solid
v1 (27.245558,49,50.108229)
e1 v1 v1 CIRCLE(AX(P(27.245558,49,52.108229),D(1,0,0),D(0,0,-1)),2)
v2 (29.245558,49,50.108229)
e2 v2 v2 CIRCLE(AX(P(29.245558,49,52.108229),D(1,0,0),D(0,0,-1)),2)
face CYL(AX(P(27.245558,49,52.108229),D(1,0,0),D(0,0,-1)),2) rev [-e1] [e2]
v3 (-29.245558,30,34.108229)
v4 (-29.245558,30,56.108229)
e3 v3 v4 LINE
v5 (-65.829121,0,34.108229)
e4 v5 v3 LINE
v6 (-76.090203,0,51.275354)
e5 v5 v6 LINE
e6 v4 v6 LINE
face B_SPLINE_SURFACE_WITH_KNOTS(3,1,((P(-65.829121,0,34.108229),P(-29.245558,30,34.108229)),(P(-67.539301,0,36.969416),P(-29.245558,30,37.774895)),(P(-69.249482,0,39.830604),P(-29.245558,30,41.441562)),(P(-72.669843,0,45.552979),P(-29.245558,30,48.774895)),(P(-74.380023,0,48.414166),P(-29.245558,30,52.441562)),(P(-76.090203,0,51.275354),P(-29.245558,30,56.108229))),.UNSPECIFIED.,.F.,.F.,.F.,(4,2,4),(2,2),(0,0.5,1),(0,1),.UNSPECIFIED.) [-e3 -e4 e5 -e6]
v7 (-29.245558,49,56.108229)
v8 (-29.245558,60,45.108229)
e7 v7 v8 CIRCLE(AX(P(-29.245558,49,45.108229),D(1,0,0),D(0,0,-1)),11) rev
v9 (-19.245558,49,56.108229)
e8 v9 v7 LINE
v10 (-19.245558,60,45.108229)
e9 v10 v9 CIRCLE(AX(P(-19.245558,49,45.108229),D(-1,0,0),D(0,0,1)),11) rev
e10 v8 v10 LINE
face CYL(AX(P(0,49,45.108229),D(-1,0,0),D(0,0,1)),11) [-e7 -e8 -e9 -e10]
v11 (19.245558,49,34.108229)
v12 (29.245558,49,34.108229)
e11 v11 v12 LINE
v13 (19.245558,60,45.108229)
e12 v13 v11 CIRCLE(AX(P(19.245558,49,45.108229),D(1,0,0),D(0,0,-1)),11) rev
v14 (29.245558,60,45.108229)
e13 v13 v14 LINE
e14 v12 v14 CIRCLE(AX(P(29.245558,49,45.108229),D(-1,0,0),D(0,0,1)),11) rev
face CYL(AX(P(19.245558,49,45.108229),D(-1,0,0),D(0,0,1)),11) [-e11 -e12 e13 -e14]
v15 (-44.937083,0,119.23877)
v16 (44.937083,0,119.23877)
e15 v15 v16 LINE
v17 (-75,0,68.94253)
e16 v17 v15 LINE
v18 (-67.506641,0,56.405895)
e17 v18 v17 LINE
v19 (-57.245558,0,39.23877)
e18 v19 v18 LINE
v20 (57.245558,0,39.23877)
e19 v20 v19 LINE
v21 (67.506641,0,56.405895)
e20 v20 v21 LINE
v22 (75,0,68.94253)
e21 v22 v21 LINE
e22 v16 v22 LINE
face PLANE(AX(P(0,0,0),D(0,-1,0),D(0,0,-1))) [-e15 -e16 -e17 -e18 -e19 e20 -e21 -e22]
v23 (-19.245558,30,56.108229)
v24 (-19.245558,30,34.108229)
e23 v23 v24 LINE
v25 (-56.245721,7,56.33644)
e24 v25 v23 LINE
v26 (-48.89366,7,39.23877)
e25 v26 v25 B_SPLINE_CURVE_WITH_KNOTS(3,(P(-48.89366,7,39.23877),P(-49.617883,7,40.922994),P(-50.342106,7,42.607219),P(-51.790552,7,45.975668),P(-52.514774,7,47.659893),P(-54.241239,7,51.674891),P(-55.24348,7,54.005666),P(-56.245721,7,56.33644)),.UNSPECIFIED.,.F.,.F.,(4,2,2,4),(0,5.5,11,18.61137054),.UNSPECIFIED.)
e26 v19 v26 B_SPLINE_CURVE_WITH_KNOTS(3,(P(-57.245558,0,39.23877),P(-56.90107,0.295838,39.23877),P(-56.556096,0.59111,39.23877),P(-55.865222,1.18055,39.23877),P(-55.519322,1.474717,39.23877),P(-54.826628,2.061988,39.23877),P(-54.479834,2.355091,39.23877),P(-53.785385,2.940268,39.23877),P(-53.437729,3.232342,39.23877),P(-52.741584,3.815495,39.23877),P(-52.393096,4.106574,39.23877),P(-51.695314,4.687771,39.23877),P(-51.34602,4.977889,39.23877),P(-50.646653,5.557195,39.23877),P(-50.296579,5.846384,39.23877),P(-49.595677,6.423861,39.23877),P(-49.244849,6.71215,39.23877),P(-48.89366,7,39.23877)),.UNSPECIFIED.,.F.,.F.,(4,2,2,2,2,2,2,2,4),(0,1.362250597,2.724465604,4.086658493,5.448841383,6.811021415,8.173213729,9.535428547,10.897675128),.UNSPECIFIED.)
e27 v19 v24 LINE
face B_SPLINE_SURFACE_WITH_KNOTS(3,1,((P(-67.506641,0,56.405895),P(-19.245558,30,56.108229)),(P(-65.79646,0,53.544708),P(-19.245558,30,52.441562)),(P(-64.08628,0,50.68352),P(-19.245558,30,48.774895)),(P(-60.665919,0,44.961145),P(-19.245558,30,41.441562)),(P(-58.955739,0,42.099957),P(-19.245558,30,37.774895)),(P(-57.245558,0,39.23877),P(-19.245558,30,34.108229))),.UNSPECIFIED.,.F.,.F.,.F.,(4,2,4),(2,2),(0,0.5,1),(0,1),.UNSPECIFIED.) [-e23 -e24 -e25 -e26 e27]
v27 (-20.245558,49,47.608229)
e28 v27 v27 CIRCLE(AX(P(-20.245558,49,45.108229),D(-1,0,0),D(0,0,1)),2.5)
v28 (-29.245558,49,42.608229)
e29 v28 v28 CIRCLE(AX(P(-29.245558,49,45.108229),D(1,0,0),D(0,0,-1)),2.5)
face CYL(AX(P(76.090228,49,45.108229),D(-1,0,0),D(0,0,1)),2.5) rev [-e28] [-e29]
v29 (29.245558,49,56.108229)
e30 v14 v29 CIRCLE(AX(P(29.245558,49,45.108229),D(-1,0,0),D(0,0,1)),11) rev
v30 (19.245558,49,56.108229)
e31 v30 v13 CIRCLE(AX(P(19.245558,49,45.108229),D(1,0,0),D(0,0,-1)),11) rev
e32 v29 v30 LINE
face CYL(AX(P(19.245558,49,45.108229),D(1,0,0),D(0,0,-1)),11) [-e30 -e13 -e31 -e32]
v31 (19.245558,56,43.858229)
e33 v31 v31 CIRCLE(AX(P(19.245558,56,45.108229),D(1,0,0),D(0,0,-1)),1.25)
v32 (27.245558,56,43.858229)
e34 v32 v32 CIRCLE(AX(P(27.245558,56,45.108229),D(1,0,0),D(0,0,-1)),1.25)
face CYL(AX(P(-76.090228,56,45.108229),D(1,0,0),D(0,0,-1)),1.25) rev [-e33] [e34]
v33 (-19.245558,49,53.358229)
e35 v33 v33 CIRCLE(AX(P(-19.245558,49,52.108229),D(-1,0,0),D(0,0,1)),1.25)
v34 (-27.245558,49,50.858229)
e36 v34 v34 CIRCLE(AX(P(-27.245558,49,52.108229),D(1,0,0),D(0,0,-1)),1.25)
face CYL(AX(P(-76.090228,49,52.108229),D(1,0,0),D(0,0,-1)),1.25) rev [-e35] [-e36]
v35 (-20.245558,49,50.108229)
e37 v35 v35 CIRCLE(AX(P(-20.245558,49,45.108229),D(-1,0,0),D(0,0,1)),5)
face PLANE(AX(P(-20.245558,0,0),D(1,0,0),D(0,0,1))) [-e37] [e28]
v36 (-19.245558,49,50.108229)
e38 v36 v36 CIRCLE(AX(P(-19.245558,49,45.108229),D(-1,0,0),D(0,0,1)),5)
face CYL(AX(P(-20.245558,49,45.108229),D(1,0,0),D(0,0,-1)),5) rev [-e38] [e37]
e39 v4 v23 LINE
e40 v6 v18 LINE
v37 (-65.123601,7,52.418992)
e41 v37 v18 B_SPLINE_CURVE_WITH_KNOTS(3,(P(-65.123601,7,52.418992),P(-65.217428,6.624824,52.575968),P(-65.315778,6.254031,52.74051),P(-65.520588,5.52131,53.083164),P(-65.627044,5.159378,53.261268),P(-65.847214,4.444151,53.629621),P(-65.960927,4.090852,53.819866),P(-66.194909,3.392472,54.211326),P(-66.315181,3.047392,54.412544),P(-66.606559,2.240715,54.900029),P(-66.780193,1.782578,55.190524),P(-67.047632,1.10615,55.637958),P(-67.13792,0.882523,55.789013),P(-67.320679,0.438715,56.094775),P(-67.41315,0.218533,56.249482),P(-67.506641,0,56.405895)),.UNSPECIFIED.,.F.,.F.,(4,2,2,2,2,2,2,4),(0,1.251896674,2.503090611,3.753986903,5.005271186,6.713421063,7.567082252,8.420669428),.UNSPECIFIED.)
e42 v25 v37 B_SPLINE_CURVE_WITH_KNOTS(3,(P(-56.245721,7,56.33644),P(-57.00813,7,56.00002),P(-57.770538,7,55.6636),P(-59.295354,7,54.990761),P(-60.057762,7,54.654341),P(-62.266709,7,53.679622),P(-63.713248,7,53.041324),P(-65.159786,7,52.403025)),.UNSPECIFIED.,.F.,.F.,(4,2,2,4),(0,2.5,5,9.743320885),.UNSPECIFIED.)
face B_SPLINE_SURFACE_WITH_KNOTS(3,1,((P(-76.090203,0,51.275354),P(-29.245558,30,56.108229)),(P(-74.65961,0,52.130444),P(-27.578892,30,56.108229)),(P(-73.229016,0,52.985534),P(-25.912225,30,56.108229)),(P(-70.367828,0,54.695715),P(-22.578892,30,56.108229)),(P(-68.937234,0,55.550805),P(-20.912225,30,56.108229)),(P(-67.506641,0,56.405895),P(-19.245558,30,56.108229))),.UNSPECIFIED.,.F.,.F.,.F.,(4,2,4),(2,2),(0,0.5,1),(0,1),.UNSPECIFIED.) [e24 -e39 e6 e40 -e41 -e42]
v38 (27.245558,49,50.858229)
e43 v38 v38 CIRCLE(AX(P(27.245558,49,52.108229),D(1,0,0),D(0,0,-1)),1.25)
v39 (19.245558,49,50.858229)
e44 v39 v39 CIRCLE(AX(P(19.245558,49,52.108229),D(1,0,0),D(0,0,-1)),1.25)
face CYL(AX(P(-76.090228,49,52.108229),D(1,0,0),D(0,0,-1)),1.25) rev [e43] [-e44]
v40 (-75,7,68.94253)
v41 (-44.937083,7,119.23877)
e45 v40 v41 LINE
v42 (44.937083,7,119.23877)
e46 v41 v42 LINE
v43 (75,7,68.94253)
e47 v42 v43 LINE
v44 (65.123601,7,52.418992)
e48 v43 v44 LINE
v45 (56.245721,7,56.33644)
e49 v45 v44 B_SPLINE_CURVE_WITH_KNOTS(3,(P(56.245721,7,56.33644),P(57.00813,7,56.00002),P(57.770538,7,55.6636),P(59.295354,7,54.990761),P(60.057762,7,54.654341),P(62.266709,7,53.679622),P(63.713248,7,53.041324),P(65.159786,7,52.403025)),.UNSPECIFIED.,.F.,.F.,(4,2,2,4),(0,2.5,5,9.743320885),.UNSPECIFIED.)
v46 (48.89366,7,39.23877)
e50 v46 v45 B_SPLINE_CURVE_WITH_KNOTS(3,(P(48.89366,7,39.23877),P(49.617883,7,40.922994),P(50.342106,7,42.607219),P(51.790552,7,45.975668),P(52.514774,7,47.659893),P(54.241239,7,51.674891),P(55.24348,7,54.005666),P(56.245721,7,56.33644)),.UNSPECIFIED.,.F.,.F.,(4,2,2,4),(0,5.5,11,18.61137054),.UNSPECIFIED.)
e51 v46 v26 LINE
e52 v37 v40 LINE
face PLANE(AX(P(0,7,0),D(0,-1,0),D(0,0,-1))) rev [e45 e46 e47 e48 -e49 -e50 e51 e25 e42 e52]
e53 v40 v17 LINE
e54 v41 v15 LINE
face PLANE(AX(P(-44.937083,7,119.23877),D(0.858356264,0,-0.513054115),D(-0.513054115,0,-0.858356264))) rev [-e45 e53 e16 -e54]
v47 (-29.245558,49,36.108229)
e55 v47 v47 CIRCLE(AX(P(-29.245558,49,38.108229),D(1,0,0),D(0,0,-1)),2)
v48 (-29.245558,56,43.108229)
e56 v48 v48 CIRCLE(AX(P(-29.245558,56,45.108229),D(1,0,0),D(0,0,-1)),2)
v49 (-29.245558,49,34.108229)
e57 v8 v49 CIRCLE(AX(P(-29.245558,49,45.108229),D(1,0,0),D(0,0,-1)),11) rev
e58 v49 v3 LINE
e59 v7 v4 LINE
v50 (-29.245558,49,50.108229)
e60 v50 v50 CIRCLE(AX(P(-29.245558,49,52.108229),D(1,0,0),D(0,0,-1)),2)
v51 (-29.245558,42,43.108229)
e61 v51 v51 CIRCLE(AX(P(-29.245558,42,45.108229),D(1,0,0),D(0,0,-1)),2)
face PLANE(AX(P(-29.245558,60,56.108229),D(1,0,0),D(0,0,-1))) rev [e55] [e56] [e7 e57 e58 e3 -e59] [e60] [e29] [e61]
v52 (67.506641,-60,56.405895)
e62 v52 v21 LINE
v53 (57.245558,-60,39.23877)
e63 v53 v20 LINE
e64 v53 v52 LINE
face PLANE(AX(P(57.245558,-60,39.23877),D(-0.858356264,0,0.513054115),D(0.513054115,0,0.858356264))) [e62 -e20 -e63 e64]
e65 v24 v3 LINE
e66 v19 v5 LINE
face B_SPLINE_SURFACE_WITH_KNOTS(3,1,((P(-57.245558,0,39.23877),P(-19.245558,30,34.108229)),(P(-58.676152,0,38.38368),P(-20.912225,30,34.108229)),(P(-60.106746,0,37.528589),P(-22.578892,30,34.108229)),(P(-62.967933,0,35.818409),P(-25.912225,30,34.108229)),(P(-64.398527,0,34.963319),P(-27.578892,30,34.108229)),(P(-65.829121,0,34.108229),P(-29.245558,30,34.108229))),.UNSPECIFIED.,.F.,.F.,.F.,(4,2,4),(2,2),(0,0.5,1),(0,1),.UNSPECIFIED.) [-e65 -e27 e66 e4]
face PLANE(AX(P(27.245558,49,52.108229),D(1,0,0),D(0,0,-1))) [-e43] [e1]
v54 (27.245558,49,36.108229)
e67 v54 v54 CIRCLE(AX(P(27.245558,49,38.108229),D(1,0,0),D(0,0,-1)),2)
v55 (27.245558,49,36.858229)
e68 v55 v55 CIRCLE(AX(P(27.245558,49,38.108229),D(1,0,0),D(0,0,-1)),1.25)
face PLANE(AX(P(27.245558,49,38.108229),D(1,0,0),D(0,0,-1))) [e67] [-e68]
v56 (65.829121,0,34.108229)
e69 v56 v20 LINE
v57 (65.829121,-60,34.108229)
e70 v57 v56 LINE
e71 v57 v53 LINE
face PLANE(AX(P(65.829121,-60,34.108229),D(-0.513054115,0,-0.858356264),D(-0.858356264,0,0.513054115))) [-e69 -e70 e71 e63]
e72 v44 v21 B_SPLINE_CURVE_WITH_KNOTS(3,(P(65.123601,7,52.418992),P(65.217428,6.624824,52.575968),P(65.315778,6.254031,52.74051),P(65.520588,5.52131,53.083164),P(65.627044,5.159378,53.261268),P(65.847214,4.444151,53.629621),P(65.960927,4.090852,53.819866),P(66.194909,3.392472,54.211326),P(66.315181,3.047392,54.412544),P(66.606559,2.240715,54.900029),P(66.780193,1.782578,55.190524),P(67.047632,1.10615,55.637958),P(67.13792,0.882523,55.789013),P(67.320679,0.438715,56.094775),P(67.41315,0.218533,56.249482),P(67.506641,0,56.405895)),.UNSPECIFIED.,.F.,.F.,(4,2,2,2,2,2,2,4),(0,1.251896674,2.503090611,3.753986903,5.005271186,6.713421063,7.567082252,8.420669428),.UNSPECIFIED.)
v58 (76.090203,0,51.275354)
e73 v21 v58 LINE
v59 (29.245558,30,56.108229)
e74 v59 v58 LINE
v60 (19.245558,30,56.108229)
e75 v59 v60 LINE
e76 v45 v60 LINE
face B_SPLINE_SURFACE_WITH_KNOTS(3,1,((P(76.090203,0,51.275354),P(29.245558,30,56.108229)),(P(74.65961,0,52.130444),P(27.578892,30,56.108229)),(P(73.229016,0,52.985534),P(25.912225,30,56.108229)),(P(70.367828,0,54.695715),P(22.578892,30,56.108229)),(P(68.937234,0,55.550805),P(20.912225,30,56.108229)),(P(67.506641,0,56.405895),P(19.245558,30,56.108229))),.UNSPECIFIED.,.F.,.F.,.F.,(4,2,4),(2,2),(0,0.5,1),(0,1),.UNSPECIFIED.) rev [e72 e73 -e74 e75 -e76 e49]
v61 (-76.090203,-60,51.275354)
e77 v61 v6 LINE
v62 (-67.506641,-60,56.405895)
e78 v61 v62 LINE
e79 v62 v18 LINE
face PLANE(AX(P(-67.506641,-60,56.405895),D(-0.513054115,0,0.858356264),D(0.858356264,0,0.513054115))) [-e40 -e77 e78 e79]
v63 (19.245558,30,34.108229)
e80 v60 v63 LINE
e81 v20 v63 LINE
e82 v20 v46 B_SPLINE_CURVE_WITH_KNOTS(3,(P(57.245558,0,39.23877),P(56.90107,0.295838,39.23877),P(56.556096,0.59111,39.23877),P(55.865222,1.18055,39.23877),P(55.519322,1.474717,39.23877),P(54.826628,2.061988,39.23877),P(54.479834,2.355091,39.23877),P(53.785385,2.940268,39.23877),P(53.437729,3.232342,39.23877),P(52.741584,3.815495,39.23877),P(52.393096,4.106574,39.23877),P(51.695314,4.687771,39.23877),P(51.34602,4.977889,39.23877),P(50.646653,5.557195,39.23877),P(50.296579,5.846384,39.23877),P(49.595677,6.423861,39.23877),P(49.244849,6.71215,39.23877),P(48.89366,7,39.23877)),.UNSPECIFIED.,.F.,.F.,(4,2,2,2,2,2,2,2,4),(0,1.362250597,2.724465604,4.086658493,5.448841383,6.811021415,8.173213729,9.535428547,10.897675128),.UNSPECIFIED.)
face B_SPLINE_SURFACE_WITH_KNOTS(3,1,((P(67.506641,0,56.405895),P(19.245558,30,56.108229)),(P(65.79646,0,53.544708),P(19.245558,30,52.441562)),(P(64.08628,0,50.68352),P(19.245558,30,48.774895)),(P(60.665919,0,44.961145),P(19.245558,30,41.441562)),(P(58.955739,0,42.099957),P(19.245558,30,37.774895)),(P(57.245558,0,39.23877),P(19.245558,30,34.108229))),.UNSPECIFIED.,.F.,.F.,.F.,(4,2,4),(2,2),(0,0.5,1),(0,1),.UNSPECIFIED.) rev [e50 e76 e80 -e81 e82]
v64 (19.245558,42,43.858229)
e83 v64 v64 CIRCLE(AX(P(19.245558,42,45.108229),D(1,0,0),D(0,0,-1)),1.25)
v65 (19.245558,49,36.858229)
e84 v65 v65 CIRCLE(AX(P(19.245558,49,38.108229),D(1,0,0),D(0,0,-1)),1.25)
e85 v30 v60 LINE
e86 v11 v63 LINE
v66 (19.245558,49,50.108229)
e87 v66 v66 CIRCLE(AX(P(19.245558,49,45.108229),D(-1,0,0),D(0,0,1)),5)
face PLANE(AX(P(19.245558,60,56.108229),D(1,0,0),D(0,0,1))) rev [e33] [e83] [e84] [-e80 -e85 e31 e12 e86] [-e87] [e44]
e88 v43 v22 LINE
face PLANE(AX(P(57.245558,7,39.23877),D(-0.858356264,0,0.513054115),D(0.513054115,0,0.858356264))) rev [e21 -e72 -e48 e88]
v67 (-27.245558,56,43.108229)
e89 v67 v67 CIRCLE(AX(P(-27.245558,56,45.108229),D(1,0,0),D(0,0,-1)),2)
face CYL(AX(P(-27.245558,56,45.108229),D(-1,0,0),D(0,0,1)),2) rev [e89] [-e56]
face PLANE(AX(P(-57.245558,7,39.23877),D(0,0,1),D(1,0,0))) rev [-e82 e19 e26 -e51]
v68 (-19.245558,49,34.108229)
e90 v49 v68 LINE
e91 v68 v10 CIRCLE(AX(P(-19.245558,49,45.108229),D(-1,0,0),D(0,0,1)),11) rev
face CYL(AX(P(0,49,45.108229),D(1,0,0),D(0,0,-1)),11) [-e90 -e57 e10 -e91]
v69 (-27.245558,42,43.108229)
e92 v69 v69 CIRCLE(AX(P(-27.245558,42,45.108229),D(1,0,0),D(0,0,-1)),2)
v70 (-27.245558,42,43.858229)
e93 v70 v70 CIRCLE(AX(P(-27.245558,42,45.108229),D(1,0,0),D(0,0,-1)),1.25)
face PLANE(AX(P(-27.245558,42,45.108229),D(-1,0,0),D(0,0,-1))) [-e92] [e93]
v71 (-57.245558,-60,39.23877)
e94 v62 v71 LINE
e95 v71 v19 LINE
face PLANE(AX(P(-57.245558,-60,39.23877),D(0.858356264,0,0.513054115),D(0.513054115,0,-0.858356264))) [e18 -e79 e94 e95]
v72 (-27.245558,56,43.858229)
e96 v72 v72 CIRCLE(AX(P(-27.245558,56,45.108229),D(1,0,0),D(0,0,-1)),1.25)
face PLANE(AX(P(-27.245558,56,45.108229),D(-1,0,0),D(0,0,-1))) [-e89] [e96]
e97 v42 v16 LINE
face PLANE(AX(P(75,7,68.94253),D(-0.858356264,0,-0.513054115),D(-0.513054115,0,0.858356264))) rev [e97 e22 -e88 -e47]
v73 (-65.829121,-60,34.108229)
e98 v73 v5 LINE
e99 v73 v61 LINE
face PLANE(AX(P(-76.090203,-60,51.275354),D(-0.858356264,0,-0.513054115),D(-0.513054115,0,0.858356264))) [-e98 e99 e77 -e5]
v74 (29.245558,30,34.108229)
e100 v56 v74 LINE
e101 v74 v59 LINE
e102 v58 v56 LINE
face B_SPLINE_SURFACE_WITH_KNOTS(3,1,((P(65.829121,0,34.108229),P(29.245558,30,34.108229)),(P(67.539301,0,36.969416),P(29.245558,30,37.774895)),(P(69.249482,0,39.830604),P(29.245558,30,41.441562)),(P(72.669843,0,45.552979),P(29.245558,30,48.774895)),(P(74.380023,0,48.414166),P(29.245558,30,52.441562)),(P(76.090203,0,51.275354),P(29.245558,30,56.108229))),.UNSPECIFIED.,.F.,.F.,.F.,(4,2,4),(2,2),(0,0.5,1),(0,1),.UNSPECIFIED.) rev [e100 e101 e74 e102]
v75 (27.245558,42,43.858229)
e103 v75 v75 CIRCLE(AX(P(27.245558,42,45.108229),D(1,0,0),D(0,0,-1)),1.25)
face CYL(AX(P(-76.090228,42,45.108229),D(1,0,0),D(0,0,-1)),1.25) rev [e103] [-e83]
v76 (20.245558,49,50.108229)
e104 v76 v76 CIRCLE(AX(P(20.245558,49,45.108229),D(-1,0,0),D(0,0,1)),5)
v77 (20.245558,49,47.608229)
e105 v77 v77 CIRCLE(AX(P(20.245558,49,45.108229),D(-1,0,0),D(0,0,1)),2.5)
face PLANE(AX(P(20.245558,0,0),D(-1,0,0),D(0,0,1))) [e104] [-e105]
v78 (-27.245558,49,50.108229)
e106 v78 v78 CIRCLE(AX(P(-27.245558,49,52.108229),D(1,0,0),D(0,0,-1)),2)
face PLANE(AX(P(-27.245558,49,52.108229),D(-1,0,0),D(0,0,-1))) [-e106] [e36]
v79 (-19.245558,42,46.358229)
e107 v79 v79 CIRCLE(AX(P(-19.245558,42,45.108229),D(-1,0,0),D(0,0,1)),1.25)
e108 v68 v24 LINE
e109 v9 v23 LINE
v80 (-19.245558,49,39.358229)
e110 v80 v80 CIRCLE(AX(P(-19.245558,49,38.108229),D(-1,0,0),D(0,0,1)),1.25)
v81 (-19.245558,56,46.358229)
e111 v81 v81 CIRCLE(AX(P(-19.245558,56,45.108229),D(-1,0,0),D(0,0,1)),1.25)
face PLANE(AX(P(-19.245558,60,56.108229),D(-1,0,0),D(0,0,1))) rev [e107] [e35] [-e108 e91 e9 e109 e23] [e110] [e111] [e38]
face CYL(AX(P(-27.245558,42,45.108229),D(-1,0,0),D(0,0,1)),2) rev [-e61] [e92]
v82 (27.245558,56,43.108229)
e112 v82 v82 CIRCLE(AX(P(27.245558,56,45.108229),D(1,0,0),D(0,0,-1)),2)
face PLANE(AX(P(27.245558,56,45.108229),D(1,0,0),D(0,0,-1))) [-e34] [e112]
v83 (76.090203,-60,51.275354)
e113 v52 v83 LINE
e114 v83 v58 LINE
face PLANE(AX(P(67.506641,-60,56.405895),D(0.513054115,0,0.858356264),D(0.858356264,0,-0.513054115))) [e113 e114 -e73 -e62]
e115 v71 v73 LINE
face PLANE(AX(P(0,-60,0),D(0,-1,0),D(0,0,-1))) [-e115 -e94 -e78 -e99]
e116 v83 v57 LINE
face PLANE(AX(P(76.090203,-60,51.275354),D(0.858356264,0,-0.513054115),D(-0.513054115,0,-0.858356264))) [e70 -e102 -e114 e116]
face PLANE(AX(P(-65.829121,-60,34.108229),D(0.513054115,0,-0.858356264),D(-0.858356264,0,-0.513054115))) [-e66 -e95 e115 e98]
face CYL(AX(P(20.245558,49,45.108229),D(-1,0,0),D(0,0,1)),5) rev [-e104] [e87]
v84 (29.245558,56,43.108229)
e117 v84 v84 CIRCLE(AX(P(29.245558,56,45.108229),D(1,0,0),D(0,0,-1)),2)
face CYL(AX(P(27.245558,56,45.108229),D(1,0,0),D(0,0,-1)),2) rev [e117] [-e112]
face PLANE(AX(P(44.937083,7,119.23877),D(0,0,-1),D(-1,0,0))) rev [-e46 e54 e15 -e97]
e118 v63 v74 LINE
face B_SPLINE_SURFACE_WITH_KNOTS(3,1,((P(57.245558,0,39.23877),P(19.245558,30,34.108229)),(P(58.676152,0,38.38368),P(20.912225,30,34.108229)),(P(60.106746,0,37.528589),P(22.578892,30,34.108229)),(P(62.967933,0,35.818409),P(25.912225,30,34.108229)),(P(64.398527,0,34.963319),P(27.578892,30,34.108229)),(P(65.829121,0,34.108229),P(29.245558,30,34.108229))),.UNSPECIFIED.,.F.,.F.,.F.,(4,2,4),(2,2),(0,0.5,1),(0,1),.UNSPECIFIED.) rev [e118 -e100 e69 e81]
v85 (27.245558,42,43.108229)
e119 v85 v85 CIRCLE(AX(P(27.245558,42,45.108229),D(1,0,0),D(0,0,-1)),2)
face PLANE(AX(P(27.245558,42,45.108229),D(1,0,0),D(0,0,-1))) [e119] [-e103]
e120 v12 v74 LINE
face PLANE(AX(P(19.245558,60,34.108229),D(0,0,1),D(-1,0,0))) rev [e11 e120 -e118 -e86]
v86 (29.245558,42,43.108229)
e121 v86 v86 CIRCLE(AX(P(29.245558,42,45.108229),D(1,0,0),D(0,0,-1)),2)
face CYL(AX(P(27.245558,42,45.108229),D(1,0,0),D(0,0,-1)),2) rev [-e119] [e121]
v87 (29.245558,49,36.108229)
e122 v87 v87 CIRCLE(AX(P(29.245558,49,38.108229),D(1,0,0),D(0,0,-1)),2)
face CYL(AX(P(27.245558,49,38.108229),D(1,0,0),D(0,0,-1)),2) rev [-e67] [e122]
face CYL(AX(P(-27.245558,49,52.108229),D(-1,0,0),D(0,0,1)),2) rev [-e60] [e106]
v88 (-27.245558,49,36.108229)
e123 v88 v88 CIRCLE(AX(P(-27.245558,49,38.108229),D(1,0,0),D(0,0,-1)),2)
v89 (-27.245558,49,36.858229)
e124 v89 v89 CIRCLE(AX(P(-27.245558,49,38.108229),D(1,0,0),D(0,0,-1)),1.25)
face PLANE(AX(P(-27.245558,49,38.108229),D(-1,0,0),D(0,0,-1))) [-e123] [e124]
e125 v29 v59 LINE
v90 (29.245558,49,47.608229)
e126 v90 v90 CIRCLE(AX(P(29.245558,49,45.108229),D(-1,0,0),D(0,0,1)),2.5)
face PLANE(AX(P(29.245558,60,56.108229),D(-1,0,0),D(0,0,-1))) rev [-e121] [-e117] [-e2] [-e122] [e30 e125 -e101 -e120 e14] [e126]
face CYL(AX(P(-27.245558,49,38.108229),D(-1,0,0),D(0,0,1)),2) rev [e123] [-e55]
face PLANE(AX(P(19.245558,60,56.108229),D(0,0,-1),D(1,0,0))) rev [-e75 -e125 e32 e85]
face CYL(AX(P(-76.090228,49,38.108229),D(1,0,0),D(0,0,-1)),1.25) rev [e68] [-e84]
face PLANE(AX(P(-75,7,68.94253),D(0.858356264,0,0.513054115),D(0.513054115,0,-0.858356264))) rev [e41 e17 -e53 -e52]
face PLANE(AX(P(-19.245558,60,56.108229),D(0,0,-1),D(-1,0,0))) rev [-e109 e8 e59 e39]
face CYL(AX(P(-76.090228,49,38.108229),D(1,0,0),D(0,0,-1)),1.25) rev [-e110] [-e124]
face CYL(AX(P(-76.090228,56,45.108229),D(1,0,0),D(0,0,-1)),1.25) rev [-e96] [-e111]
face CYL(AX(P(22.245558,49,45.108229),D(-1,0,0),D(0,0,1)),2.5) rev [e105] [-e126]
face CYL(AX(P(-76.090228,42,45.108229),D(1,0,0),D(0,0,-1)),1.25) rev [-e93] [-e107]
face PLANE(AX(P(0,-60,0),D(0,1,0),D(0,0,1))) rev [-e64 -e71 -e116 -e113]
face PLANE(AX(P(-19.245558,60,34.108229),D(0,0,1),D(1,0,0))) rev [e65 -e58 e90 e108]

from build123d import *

# Parameters (mm, degrees)
BOSS_EXTRUDE1_DEPTH     = 60
BOSS_EXTRUDE1_2_DEPTH   = 60
BOSS_EXTRUDE2_START     = 30
SKETCH5_W               = 10
SKETCH5_H               = 22
BOSS_EXTRUDE2_DEPTH     = 30
FILLET1_R               = 11
FILLET2_R               = 11
BOSS_EXTRUDE5_DEPTH     = 7
SKETCH12_R              = 5
SKETCH12_R_2            = 2.5
CUT_EXTRUDE1_DEPTH      = 1
SKETCH12_3_R            = 2.5
CUT_EXTRUDE2_DEPTH      = 3
CUT_EXTRUDE8_DEPTH      = 165.032898367
CUT_EXTRUDE8_DEPTH_BACK = 165.032898367
SKETCH16_R              = 2.5
SKETCH17_R              = 1.25
CUT_EXTRUDE9_DEPTH      = 171.03972178
SKETCH17_3_R            = 2
SKETCH17_3_R_2          = 1.25
CUT_EXTRUDE10_DEPTH     = 2


with BuildPart() as part:
    # Sketch4 → Boss-Extrude1 (new body)
    with BuildSketch(Plane(origin=(0, 0, 0), x_dir=(1, 0, 0), z_dir=(0, 1, 0))):
        Polygon((67.506640691, -56.405895144), (76.090203327, -51.275353996), (65.82912103, -34.108228724), (57.245558394, -39.238769873), align=None)
    extrude(amount=-BOSS_EXTRUDE1_DEPTH)



with BuildPart() as body_2:
    # Sketch4 → Boss-Extrude1 2 (new body)
    with BuildSketch(Plane(origin=(0, 0, 0), x_dir=(1, 0, 0), z_dir=(0, 1, 0))):
        Polygon((-57.245558394, -39.238769873), (-67.506640691, -56.405895144), (-76.090203327, -51.275353996), (-65.82912103, -34.108228724), align=None)
    extrude(amount=-BOSS_EXTRUDE1_2_DEPTH)



with BuildPart() as body_3:
    # Sketch5 → Boss-Extrude2 (new body)
    with BuildSketch(Plane(origin=(0, 0, 0), x_dir=(1, 0, 0), z_dir=(0, 1, 0)).offset(BOSS_EXTRUDE2_START)):
        with Locations((-24.245558394, -45.108228724)):
            Rectangle(SKETCH5_W, SKETCH5_H)
    extrude(amount=BOSS_EXTRUDE2_DEPTH)


with BuildPart() as body_2_1:
    add(body_2.part)

    add(body_3.part)  # loft1 joins it to this body
    # loft from a face of the part (loft1)
    loft([body_2_1.faces().sort_by_distance((-66.667880861, 0, 45.257061934))[0], body_2_1.faces().sort_by_distance((-24.245558394, 30, 45.108228724))[0]])


with BuildPart() as body_3_2:
    # Mirror1: mirrored copy
    add(body_2_1.part.mirror(Plane(origin=(0, 0, 0), x_dir=(0, 0, 1), z_dir=(1, 0, 0))))

    # Fillet2
    fillet2_edges = [body_3_2.edges().sort_by_distance(p)[0] for p in [
        (24.245558394, 60, 34.108228724),
        (24.245558394, 60, 56.108228724),
    ]]
    fillet(fillet2_edges, radius=FILLET2_R - 0.0001)  # a hair under: the kernel refuses the full size


with BuildPart() as body_2_2:
    add(body_2_1.part)

    # Fillet1
    fillet1_edges = [body_2_2.edges().sort_by_distance(p)[0] for p in [
        (-24.245558394, 60, 34.108228724),
        (-24.245558394, 60, 56.108228724),
    ]]
    fillet(fillet1_edges, radius=FILLET1_R - 0.0001)  # a hair under: the kernel refuses the full size


with BuildPart() as part_1:
    add(part.part)

    add(body_2_2.part)  # Boss-Extrude5 merges body 2

    add(body_3_2.part)  # Boss-Extrude5 merges body 3 2
    # Sketch11 → Boss-Extrude5 (add)
    with BuildSketch(Plane(origin=(0, 0, 0), x_dir=(1, 0, 0), z_dir=(0, 1, 0))):
        Polygon((75, -68.942529607), (44.93708309, -119.238769873), (-44.93708309, -119.238769873), (-75, -68.942529607), (-57.245558394, -39.238769873), (57.245558394, -39.238769873), align=None)
    extrude(amount=BOSS_EXTRUDE5_DEPTH)

    # Sketch12 → Cut-Extrude1 (cut)
    with BuildSketch(Plane.ZY.offset(-19.245558394)):
        with Locations((45.108228724, 49)):
            Circle(SKETCH12_R)
        with Locations((45.108228724, 49)):
            Circle(SKETCH12_R_2, mode=Mode.SUBTRACT)
    cut_extrude1 = extrude(amount=-CUT_EXTRUDE1_DEPTH, mode=Mode.SUBTRACT)

    # Sketch12<3> → Cut-Extrude2 (cut)
    with BuildSketch(Plane.ZY.offset(-19.245558394)):
        with Locations((45.108228724, 49)):
            Circle(SKETCH12_3_R)
    cut_extrude2 = extrude(amount=-CUT_EXTRUDE2_DEPTH, mode=Mode.SUBTRACT)

    # Sketch16 → Cut-Extrude8 (cut, two sides: drawn at the far end of the back side and taken through both)
    with BuildSketch(Plane.ZY.offset(-19.245558394).offset(-CUT_EXTRUDE8_DEPTH_BACK)):
        with Locations((45.108228724, 49)):
            Circle(SKETCH16_R)
    extrude(amount=CUT_EXTRUDE8_DEPTH + CUT_EXTRUDE8_DEPTH_BACK, mode=Mode.SUBTRACT)

    # Sketch17 → Cut-Extrude9 (cut, through all)
    with BuildSketch(Plane(origin=(29.245558394, 0, 0), x_dir=(0, 0, -1), z_dir=(1, 0, 0))):
        with Locations((-38.108228724, 49)):
            Circle(SKETCH17_R)
        with BuildLine():
            ThreePointArc((-45.108228724, 57.25), (-46.358228724, 56), (-45.108228724, 54.75))
            Line((-45.108228724, 54.75), (-45.108228724, 57.25))
        make_face()
        with BuildLine():
            Line((-45.108228724, 57.25), (-45.108228724, 54.75))
            ThreePointArc((-45.108228724, 54.75), (-44.224345248, 55.116116524), (-43.858228724, 56))
            ThreePointArc((-43.858228724, 56), (-44.224345248, 56.883883476), (-45.108228724, 57.25))
        make_face()
        with Locations((-52.108228724, 49)):
            Circle(SKETCH17_R)
        with Locations((-45.108228724, 42)):
            Circle(SKETCH17_R)
    extrude(amount=-CUT_EXTRUDE9_DEPTH, mode=Mode.SUBTRACT)

    # Sketch17<3> → Cut-Extrude10 (cut)
    # profile 1 of 4: a face of its own
    with BuildSketch(Plane(origin=(29.245558394, 0, 0), x_dir=(0, 0, -1), z_dir=(1, 0, 0))):
        with Locations((-45.108228724, 56)):
            Circle(SKETCH17_3_R)
        with Locations((-45.108228724, 56)):
            Circle(SKETCH17_3_R_2, mode=Mode.SUBTRACT)
    # profile 2 of 4: a face of its own
    with BuildSketch(Plane(origin=(29.245558394, 0, 0), x_dir=(0, 0, -1), z_dir=(1, 0, 0))):
        with Locations((-38.108228724, 49)):
            Circle(SKETCH17_3_R)
        with Locations((-38.108228724, 49)):
            Circle(SKETCH17_3_R_2, mode=Mode.SUBTRACT)
    # profile 3 of 4: a face of its own
    with BuildSketch(Plane(origin=(29.245558394, 0, 0), x_dir=(0, 0, -1), z_dir=(1, 0, 0))):
        with Locations((-45.108228724, 42)):
            Circle(SKETCH17_3_R)
        with Locations((-45.108228724, 42)):
            Circle(SKETCH17_3_R_2, mode=Mode.SUBTRACT)
    # profile 4 of 4: a face of its own
    with BuildSketch(Plane(origin=(29.245558394, 0, 0), x_dir=(0, 0, -1), z_dir=(1, 0, 0))):
        with Locations((-52.108228724, 49)):
            Circle(SKETCH17_3_R)
        with Locations((-52.108228724, 49)):
            Circle(SKETCH17_3_R_2, mode=Mode.SUBTRACT)
    cut_extrude10 = extrude(amount=-CUT_EXTRUDE10_DEPTH, mode=Mode.SUBTRACT)

    # Mirror3: Cut-Extrude1, Cut-Extrude2, Cut-Extrude10 across plane
    add(cut_extrude1.mirror(Plane.ZY), mode=Mode.SUBTRACT)
    add(cut_extrude2.mirror(Plane.ZY), mode=Mode.SUBTRACT)
    add(cut_extrude10.mirror(Plane.ZY), mode=Mode.SUBTRACT)


solid = part_1.part
